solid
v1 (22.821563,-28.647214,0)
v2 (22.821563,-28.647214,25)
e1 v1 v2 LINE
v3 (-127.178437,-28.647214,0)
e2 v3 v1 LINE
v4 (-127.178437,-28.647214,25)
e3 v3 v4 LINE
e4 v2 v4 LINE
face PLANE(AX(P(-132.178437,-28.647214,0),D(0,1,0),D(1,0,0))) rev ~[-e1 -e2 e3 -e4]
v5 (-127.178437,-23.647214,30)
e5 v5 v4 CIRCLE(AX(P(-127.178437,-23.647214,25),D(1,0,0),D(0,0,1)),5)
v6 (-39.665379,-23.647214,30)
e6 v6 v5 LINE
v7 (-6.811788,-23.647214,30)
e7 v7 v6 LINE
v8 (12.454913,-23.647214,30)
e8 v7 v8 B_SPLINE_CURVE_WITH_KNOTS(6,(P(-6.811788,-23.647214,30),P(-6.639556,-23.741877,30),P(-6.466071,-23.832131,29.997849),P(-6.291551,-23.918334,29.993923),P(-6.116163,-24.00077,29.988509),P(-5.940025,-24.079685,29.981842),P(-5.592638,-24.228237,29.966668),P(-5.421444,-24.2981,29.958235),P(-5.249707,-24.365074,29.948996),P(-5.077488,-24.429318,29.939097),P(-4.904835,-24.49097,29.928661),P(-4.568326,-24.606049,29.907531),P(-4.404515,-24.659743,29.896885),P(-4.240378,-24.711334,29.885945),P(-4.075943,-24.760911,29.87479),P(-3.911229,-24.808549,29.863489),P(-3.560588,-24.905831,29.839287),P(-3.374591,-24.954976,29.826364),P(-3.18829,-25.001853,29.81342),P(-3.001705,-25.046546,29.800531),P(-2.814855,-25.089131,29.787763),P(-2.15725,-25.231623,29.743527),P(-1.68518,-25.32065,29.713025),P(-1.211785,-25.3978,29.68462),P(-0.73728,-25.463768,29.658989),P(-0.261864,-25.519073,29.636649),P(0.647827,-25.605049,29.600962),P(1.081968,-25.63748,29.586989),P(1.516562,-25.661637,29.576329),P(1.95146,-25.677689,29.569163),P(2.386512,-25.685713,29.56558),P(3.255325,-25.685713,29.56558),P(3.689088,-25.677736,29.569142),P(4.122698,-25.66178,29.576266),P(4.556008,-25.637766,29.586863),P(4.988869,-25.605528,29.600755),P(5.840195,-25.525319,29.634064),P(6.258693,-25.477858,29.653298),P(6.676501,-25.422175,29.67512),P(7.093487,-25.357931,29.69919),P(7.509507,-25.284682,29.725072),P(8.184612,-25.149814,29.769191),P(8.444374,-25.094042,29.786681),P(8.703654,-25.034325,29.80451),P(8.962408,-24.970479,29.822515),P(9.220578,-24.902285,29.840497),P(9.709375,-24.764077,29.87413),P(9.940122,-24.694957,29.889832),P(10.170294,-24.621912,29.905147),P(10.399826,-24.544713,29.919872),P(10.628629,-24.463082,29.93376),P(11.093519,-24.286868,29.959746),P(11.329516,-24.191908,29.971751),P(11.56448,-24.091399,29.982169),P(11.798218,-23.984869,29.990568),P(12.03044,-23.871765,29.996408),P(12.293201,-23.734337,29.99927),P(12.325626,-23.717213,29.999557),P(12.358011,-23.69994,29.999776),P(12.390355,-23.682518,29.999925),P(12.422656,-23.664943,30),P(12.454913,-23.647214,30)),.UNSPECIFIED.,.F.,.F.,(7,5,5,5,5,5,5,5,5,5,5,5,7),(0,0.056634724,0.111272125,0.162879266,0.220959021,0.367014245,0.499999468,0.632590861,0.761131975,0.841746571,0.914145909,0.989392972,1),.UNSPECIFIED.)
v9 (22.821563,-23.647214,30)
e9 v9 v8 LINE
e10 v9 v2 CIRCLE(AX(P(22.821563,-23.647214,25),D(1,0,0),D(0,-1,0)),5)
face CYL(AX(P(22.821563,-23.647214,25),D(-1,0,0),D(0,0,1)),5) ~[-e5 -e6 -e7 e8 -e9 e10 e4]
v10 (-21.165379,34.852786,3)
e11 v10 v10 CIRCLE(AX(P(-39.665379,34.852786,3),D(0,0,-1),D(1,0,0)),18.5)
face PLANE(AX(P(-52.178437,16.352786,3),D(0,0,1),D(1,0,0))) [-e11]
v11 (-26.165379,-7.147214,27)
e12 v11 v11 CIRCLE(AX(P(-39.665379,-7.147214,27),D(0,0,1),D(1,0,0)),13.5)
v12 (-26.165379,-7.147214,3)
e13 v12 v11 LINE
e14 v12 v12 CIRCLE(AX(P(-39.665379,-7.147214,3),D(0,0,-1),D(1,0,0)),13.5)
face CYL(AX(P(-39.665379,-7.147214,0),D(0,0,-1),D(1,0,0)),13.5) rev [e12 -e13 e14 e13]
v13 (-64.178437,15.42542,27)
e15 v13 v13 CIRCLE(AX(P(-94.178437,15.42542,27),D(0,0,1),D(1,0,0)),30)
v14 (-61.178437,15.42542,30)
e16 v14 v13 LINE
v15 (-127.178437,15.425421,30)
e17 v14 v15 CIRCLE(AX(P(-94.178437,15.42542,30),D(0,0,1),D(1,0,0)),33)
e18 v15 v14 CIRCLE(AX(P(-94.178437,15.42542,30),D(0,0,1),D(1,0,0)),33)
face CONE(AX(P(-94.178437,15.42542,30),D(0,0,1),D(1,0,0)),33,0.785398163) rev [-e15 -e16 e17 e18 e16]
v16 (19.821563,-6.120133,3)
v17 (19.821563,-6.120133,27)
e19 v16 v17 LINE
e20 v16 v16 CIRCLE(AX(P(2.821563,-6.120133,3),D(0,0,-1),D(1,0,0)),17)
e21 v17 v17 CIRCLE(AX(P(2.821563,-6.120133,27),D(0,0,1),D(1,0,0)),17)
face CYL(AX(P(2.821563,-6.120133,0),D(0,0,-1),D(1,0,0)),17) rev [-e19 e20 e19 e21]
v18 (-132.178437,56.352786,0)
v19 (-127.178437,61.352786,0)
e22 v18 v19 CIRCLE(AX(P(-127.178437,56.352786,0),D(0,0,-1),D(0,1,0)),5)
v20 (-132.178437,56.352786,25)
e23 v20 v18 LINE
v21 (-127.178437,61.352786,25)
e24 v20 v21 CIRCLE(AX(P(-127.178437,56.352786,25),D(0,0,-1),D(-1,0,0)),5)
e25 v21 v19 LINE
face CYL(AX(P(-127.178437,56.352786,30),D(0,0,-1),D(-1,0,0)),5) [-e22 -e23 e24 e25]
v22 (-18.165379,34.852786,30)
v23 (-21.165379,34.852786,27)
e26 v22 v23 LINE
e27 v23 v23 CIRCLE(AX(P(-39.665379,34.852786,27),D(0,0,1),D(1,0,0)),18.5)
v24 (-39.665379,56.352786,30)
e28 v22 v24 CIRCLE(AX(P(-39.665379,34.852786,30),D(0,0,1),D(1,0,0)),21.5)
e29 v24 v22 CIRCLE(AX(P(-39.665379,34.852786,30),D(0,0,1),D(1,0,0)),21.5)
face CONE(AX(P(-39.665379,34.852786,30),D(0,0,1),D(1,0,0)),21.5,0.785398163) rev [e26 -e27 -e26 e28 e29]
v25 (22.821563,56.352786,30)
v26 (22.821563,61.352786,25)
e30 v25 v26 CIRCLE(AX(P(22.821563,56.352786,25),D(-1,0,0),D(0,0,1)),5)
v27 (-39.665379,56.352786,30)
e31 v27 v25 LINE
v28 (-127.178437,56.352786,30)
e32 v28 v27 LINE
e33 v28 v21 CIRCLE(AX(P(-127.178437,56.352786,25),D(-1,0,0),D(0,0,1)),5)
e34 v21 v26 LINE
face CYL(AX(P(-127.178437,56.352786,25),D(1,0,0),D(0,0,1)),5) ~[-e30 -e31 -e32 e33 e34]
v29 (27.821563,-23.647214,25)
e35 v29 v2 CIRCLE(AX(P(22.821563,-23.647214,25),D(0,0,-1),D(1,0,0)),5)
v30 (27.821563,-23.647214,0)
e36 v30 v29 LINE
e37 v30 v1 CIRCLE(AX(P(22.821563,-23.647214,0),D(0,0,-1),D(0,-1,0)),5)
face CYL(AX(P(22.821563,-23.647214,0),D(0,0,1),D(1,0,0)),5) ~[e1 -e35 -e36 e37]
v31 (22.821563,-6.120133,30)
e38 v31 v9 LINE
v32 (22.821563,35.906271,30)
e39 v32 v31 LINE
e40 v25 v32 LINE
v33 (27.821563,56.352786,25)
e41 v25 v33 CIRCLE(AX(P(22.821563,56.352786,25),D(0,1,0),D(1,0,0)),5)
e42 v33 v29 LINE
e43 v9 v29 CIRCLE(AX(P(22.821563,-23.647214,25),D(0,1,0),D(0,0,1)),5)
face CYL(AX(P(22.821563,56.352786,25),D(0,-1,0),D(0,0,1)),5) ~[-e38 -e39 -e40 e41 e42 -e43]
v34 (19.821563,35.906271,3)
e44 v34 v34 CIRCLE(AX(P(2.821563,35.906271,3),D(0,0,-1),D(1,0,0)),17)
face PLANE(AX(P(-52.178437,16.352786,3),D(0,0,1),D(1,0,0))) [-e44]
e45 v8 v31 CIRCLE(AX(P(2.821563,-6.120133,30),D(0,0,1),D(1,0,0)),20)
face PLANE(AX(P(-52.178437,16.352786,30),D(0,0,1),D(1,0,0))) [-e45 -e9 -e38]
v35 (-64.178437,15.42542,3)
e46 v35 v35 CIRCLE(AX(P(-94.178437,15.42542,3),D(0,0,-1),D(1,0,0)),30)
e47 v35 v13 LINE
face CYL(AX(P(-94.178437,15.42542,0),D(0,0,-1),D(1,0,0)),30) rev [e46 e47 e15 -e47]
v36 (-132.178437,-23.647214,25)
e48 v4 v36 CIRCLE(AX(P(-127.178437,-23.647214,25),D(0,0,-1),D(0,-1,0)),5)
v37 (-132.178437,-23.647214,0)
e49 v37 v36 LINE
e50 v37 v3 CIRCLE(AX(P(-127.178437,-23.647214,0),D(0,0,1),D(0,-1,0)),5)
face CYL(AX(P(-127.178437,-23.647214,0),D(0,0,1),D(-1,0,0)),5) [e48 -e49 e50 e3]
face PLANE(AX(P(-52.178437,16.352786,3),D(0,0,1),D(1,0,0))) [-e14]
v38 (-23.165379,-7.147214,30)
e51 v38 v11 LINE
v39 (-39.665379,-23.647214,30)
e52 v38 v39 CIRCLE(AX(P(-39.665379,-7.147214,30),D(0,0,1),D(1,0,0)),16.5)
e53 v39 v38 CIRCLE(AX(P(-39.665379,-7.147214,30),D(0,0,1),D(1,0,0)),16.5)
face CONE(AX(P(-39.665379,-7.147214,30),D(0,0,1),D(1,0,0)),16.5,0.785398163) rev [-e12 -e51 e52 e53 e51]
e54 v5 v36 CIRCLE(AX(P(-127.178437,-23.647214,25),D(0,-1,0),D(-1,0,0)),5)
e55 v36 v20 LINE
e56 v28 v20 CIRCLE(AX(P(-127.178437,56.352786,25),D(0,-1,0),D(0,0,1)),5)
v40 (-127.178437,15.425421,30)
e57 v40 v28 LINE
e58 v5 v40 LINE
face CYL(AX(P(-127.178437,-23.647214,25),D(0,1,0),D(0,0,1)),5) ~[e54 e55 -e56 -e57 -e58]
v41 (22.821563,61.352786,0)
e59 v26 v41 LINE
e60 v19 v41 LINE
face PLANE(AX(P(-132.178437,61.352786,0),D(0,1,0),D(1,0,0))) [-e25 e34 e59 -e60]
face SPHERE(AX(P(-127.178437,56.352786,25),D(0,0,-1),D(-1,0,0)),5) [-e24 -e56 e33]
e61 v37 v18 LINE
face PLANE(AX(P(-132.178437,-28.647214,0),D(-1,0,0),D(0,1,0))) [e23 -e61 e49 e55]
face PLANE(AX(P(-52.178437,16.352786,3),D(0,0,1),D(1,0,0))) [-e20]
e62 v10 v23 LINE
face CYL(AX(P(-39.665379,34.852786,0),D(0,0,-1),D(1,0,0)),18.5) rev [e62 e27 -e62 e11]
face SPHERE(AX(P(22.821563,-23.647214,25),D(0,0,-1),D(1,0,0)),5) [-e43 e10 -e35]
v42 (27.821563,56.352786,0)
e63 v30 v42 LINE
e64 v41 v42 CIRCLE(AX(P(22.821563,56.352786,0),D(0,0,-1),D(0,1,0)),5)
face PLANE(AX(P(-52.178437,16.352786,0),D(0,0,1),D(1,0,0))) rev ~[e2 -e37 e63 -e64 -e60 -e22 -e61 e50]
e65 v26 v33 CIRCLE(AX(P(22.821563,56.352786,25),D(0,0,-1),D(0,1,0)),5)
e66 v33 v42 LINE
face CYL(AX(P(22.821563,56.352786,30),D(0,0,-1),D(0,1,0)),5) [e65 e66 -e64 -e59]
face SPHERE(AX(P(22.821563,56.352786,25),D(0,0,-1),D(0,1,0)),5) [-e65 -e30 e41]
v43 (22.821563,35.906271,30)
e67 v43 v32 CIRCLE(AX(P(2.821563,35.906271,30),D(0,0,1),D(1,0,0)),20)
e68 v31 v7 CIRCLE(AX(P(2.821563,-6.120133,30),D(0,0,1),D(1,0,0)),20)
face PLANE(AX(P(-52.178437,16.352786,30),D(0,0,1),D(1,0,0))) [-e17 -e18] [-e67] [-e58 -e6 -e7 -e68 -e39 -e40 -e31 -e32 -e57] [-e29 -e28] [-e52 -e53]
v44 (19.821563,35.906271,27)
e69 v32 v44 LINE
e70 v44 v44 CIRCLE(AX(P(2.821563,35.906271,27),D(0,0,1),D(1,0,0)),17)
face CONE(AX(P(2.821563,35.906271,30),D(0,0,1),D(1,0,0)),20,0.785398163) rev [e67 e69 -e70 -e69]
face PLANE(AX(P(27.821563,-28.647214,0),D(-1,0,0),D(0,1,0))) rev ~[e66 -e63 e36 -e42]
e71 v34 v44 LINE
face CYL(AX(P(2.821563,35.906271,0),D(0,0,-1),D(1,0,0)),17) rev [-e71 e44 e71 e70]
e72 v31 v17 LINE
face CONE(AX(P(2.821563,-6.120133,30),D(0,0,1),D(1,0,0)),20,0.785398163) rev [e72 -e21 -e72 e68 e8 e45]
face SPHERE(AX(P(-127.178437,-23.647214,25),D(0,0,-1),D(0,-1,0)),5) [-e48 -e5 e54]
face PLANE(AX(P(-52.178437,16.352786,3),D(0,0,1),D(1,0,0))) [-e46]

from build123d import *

# Parameters (mm, degrees)
F0_W     = 160
F0_H     = 90
F0_R     = 30
F0_R_2   = 13.5
F0_R_3   = 17
F0_R_4   = 18.5
F1_DEPTH = 30
F2_DEPTH = 3
F3_R     = 5
F4_R     = 5


# Not quite as in the source:
# - a fillet or chamfer that OpenCascade refuses, or shapes differently, is made with other operations: its cross-section is extruded or revolved along the edge and cut away or added


with BuildPart() as f1:
    # F0 (on Top) → F1 (new body)
    with BuildSketch(Plane.XY):
        with Locations((-52.1784374716, 16.3527858257)):
            Rectangle(F0_W, F0_H)
        with Locations((-94.1784374716, 15.4254203662)):
            Circle(F0_R, mode=Mode.SUBTRACT)
        with Locations((-39.6653786302, -7.1472141743)):
            Circle(F0_R_2, mode=Mode.SUBTRACT)
        with Locations((2.8215625284, -6.1201333007)):
            Circle(F0_R_3, mode=Mode.SUBTRACT)
        with Locations((-39.6653786302, 34.8527858257)):
            Circle(F0_R_4, mode=Mode.SUBTRACT)
        with Locations((2.8215625284, 35.9062709907)):
            Circle(F0_R_3, mode=Mode.SUBTRACT)
    extrude(amount=F1_DEPTH)

    # F0 (on Top) → F2 (join)
    with BuildSketch(Plane.XY):
        with Locations((-52.1784374716, 16.3527858257)):
            Rectangle(F0_W, F0_H)
        with Locations((-94.1784374716, 15.4254203662)):
            Circle(F0_R, mode=Mode.SUBTRACT)
        with Locations((-39.6653786302, -7.1472141743)):
            Circle(F0_R_2, mode=Mode.SUBTRACT)
        with Locations((2.8215625284, -6.1201333007)):
            Circle(F0_R_3, mode=Mode.SUBTRACT)
        with Locations((-39.6653786302, 34.8527858257)):
            Circle(F0_R_4, mode=Mode.SUBTRACT)
        with Locations((2.8215625284, 35.9062709907)):
            Circle(F0_R_3, mode=Mode.SUBTRACT)
        with Locations((-94.1784374716, 15.4254203662)):
            Circle(F0_R)
        with Locations((-39.6653786302, -7.1472141743)):
            Circle(F0_R_2)
        with Locations((2.8215625284, -6.1201333007)):
            Circle(F0_R_3)
        with Locations((2.8215625284, 35.9062709907)):
            Circle(F0_R_3)
        with Locations((-39.6653786302, 34.8527858257)):
            Circle(F0_R_4)
    extrude(amount=F2_DEPTH)

    # F3
    f3_edges = [f1.edges().sort_by_distance(p)[0] for p in [
        (27.821563, 61.352786, 15),
        (27.821563, -28.647214, 15),
        (-132.178437, -28.647214, 15),
        (-132.178437, 61.352786, 15),
    ]]
    fillet(f3_edges, radius=F3_R)

    # F4
    f4_edges = [f1.edges().sort_by_distance(p)[0] for p in [
        (-52.178437, 61.352786, 30),
        (27.821563, 16.352786, 30),
        (-52.178437, -28.647214, 30),
        (-132.178437, 16.352786, 30),
        (26.357096, -27.182748, 30),
        (26.357096, 59.88832, 30),
        (-130.713971, -27.182748, 30),
        (-130.713971, 59.88832, 30),
    ]]
    fillet(f4_edges, radius=F4_R)

    # F5: chamfer of 3 on 5 edges, made by hand

    # F5_s1 → F5_t2 (revolve, cut)
    with BuildSketch(Plane.XZ.offset(-15.4254203662)):
        Polygon((-61.1784374716, 30), (-64.1784374716, 27), (-64.1784374716, 30), align=None)
    revolve(axis=Axis((-94.1784374716, 15.4254203662, 30), (0, 0, 1)), mode=Mode.SUBTRACT)

    # F5_s3 → F5_t4 (revolve, cut)
    with BuildSketch(Plane.XZ.offset(-34.8527858257)):
        Polygon((-18.1653786302, 30), (-21.1653786302, 27), (-21.1653786302, 30), align=None)
    revolve(axis=Axis((-39.6653786302, 34.8527858257, 30), (0, 0, 1)), mode=Mode.SUBTRACT)

    # F5_s5 → F5_t6 (revolve, cut)
    with BuildSketch(Plane.XZ.offset(-35.9062709907)):
        Polygon((22.8215625284, 30), (19.8215625284, 27), (19.8215625284, 30), align=None)
    revolve(axis=Axis((2.8215625284, 35.9062709907, 30), (0, 0, 1)), mode=Mode.SUBTRACT)

    # F5_s7 → F5_t8 (revolve, cut)
    with BuildSketch(Plane.XZ.offset(6.1201333007)):
        Polygon((22.8215625284, 30), (19.8215625284, 27), (19.8215625284, 30), align=None)
    revolve(axis=Axis((2.8215625284, -6.1201333007, 30), (0, 0, 1)), mode=Mode.SUBTRACT)

    # F5_s9 → F5_t10 (revolve, cut)
    with BuildSketch(Plane.XZ.offset(7.1472141743)):
        Polygon((-23.1653786302, 30), (-26.1653786302, 27), (-26.1653786302, 30), align=None)
    revolve(axis=Axis((-39.6653786302, -7.1472141743, 30), (0, 0, 1)), mode=Mode.SUBTRACT)


solid = f1.part
